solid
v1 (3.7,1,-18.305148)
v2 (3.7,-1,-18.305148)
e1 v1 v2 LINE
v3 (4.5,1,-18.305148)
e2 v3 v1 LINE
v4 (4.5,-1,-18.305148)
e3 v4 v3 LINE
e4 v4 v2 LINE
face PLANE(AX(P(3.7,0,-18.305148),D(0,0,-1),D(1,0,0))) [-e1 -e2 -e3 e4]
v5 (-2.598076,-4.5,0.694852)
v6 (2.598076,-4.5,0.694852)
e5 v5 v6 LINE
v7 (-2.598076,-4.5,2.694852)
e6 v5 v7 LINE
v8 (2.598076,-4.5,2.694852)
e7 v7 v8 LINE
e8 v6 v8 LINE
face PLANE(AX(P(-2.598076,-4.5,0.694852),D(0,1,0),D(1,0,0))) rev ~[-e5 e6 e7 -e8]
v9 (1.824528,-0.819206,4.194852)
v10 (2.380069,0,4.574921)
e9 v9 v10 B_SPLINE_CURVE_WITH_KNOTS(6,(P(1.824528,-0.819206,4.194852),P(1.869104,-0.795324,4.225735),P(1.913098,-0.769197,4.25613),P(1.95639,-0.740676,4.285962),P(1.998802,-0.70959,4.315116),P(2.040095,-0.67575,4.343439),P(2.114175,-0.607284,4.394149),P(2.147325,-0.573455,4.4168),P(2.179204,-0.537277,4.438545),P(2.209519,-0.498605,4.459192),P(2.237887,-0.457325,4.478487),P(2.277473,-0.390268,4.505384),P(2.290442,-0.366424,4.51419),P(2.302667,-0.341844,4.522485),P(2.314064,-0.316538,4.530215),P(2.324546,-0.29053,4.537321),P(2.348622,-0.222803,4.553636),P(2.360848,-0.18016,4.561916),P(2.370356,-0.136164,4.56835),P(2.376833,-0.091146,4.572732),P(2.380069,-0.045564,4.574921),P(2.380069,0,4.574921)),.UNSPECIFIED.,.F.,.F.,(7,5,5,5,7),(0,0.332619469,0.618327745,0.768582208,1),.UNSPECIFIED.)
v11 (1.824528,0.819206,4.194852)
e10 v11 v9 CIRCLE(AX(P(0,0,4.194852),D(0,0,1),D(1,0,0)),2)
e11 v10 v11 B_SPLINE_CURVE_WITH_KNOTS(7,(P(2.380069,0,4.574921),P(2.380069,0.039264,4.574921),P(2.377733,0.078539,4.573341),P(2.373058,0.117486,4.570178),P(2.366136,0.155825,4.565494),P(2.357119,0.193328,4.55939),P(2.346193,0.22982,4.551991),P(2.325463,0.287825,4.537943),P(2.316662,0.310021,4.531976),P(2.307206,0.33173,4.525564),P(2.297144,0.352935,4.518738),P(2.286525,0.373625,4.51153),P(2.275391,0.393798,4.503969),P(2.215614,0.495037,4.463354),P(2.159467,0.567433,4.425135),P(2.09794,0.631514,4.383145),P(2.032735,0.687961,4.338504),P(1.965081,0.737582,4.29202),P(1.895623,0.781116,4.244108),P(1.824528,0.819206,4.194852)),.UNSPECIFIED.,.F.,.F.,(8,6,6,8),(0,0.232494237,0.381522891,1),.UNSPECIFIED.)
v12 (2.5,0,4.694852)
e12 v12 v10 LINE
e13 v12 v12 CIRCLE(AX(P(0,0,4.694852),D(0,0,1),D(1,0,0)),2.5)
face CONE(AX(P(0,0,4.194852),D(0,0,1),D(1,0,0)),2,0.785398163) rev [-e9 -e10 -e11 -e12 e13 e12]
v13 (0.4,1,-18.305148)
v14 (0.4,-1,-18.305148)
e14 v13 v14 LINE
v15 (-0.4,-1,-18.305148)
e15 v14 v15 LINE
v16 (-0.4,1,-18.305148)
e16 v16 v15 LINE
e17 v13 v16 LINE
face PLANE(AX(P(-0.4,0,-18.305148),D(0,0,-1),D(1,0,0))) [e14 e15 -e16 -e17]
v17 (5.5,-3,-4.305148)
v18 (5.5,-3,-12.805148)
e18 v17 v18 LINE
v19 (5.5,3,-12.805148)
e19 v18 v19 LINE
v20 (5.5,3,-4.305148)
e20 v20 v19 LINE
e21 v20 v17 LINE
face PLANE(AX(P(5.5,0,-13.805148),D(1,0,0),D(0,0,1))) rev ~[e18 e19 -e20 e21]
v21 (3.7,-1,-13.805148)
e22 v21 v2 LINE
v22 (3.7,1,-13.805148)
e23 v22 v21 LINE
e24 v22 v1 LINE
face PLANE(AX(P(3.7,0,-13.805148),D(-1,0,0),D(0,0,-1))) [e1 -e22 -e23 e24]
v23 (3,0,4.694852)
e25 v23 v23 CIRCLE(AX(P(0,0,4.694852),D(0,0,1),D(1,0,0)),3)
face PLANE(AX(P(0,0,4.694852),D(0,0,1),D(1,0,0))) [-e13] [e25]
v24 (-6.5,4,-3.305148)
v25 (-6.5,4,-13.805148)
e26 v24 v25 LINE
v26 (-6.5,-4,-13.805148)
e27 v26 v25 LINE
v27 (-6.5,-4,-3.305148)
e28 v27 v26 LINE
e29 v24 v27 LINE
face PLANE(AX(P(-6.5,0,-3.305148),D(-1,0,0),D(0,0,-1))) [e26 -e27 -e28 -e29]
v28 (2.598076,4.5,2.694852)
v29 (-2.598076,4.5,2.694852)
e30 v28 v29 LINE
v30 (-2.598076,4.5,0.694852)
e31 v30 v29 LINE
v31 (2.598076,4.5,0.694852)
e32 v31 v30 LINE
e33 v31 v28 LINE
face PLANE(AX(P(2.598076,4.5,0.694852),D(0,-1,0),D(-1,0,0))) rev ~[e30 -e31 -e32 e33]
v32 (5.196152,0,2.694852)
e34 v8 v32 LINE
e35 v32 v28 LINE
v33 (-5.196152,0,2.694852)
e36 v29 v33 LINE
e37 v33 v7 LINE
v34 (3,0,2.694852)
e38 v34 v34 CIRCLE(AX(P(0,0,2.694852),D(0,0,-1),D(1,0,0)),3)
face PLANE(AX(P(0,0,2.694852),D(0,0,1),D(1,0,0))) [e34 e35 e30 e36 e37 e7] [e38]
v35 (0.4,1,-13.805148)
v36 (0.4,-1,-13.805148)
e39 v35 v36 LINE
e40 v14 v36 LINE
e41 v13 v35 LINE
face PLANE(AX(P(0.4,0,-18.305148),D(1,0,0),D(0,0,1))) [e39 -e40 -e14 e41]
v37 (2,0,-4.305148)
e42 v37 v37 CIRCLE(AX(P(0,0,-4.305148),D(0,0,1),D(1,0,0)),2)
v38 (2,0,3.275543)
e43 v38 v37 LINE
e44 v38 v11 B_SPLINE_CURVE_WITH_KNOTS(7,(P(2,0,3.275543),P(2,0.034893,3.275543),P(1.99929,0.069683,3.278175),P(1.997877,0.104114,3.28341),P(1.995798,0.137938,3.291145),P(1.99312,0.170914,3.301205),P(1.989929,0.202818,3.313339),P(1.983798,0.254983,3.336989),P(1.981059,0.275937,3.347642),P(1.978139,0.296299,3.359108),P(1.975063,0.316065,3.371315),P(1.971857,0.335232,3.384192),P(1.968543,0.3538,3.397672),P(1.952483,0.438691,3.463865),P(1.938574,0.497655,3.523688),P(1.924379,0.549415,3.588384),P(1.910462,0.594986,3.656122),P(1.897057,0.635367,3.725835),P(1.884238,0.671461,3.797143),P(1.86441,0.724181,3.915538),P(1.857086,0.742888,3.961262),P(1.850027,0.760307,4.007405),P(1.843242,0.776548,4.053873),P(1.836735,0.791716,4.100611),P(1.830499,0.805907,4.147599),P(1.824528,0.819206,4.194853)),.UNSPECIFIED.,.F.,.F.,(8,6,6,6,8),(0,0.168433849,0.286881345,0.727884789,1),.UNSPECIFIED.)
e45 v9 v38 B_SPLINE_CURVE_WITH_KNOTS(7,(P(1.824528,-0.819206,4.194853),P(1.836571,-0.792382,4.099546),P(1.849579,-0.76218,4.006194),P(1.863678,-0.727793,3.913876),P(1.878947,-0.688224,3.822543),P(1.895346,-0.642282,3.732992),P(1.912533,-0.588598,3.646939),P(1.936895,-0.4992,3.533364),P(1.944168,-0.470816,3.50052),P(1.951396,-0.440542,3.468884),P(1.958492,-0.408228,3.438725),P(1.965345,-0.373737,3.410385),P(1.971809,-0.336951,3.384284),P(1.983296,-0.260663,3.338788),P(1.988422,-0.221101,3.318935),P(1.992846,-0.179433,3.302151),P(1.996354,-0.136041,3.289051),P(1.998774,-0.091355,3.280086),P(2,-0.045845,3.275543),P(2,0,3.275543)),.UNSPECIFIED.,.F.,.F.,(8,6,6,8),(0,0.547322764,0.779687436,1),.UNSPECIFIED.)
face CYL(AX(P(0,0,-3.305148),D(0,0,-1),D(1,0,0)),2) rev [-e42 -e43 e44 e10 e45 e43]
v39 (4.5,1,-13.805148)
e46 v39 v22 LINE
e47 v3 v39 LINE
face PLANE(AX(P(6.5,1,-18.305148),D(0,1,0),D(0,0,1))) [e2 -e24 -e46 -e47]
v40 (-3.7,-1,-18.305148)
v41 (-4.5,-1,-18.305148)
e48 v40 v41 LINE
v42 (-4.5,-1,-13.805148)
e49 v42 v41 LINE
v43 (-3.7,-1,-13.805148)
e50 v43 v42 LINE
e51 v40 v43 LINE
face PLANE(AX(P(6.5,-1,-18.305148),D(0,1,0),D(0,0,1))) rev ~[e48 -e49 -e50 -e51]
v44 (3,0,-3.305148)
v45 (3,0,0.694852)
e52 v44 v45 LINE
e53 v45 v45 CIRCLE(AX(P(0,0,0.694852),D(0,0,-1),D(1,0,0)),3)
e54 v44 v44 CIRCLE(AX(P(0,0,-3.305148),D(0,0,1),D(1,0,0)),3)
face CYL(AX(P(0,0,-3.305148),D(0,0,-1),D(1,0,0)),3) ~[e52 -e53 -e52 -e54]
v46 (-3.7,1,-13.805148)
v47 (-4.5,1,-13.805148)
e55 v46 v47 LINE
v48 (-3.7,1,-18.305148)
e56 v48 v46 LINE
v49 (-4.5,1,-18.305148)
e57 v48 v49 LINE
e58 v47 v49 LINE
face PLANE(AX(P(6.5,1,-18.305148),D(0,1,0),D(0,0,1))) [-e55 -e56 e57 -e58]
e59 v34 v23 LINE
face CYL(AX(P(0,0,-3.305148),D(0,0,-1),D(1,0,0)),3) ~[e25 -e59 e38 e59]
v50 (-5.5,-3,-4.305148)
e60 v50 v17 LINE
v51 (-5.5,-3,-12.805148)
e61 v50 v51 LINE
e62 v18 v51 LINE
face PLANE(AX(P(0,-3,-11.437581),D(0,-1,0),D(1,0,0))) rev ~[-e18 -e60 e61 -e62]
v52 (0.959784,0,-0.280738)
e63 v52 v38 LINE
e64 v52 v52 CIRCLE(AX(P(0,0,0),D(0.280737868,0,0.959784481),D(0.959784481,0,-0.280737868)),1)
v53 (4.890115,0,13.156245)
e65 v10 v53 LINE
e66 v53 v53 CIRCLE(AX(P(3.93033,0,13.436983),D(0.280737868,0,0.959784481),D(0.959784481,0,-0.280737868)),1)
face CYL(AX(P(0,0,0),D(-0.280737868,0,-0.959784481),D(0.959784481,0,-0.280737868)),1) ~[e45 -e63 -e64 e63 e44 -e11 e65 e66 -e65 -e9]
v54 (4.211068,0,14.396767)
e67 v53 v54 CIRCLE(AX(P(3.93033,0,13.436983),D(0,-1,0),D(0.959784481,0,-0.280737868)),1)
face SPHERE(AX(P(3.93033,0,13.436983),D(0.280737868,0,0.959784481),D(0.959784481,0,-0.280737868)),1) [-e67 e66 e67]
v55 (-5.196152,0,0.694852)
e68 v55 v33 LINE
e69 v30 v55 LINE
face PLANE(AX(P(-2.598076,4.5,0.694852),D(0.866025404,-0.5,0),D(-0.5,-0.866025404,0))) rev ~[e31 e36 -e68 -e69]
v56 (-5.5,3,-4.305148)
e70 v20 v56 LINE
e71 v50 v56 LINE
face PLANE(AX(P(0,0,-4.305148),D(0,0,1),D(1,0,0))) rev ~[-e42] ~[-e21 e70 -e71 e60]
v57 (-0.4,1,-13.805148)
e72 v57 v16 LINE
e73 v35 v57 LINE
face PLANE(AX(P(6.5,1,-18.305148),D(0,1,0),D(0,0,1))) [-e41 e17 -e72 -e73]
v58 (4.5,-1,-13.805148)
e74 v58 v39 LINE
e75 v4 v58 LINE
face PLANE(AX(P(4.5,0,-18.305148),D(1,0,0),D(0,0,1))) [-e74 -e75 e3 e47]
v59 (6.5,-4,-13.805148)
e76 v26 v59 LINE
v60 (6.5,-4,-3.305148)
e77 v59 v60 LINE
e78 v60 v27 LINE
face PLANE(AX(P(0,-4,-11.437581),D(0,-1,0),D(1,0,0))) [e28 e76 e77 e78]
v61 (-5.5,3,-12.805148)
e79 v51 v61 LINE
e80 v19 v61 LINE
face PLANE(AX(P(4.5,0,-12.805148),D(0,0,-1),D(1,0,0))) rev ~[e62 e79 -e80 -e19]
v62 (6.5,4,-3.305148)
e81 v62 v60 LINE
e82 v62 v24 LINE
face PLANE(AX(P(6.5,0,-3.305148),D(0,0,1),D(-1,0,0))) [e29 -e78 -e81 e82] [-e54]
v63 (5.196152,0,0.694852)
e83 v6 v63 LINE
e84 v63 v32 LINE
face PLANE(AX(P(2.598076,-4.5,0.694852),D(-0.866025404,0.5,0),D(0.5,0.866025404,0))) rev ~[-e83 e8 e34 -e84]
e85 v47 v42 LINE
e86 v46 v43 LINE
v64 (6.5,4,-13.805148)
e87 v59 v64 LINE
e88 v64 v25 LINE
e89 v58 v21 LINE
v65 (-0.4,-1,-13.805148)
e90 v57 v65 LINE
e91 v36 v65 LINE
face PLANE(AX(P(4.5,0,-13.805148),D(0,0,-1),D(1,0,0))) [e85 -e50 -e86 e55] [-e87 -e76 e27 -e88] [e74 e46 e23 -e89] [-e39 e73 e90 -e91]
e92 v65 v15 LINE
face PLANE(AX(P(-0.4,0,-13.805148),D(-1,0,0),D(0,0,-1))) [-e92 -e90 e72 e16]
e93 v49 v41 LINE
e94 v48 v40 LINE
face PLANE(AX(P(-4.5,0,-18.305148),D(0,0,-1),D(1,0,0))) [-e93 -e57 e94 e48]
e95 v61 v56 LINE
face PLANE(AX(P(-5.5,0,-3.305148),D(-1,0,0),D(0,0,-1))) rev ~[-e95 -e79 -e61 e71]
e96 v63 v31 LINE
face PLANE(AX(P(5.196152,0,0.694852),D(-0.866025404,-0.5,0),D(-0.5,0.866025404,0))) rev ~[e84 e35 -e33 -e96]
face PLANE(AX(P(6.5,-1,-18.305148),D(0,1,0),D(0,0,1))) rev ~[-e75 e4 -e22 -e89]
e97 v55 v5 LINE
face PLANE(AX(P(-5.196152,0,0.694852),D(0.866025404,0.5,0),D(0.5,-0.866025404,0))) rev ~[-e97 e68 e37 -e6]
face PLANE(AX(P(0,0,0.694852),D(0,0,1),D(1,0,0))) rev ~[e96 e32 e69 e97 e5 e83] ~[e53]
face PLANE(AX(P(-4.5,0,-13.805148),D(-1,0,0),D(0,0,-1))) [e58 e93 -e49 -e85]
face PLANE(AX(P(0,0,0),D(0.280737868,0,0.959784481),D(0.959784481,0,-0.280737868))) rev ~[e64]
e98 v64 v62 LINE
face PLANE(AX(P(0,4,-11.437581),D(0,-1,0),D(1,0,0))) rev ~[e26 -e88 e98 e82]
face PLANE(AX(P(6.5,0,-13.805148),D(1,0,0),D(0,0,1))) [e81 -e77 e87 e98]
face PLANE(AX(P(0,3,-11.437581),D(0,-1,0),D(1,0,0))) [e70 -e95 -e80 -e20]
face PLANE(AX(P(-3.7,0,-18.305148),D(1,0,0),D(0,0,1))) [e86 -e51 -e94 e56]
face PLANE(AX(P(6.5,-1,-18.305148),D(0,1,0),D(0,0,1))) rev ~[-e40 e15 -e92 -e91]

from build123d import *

# Parameters (mm, degrees)
F1_DEPTH    = 4
F2_W        = 3
F2_H        = 4.5
F3_DEPTH    = 13.001
F4_R        = 3
F5_DEPTH    = 8
F8_DEPTH    = 2
F9_T        = 1
F9_T3_DEPTH = 2.8
F9_T5_DEPTH = 4
F9_T7_DEPTH = 2.8
F9_T9_DEPTH = 2.8
F11_SIZE    = 0.5
F13_R       = 1
F14_DEPTH   = 15
F15_R       = 1


# Not quite as in the source:
# - a shell that OpenCascade refuses in one call is made with other operations: the cavity is built on its own and cut out


with BuildPart() as f1:
    # F0 (on Front) → F1 (new body, symmetric)
    with BuildSketch(Plane.XZ):
        Polygon((6.5, -13.8051480774), (6.5, -3.3051480774), (-6.5, -3.3051480774), (-6.5, -13.8051480774), (-4.5, -13.8051480774), (-4.5, -18.3051480774), (-3.7, -18.3051480774), (-3.7, -13.8051480774), (-0.4, -13.8051480774), (-0.4, -18.3051480774), (0.4, -18.3051480774), (0.4, -13.8051480774), (3.7, -13.8051480774), (3.7, -18.3051480774), (4.5, -18.3051480774), (4.5, -13.8051480774), align=None)
    extrude(amount=F1_DEPTH, both=True)

    # F2 (on face) → F3 (cut, through all)
    with BuildSketch(Plane.YZ.offset(6.5)):
        with Locations((-2.5, -16.0551480774)):
            Rectangle(F2_W, F2_H)
        with Locations((2.5, -16.0551480774)):
            Rectangle(F2_W, F2_H)
    extrude(amount=-F3_DEPTH, mode=Mode.SUBTRACT)

    # F4 (on face) → F5 (join)
    with BuildSketch(Plane.XY.offset(-3.3051480774)):
        Circle(F4_R)
    extrude(amount=F5_DEPTH)

    # F7 (on offset) → F8 (join)
    with BuildSketch(Plane.XY.offset(0.6948519226)):
        Polygon((2.5980762114, -4.5), (5.1961524227, 0), (2.5980762114, 4.5), (-2.5980762114, 4.5), (-5.1961524227, 0), (-2.5980762114, -4.5), align=None)
    extrude(amount=F8_DEPTH)

    # F9: shell of thickness 1, made by hand


with BuildPart() as f9_core1:
    # F9_t2: copy of F1
    add(f1.part)

    # the walls: a layer under each face that stays
    f9_faces = [f9_core1.faces().sort_by_distance(p)[0] for p in [
        (-4.3333333333, 2.6666666667, -13.8051480774),
        (6.5, 0, -8.5551480774),
        (0, -4, -8.5551480774),
        (-6.5, 0, -8.5551480774),
        (0, 4, -8.5551480774),
        (0, 1, -16.0551480774),
        (-0.4, 0, -16.0551480774),
        (0, -1, -16.0551480774),
        (0.4, 0, -16.0551480774),
        (3.7, 0, -16.0551480774),
        (4.1, -1, -16.0551480774),
        (4.5, 0, -16.0551480774),
        (4.1, 1, -16.0551480774),
        (-4.1, 1, -16.0551480774),
        (-4.5, 0, -16.0551480774),
        (-4.1, -1, -16.0551480774),
        (-3.7, 0, -16.0551480774),
        (4.3333333333, 2.6666666667, -3.3051480774),
        (0, 0, -18.3051480774),
        (4.1, 0, -18.3051480774),
        (-4.1, 0, -18.3051480774),
        (-3, 0, -1.3051480774),
        (-3.4641016151, 0, 0.6948519226),
        (-3.897114317, -2.25, 1.6948519226),
        (-3.897114317, 2.25, 1.6948519226),
        (0, -4.5, 1.6948519226),
        (0, 4.5, 1.6948519226),
        (3.897114317, -2.25, 1.6948519226),
        (3.897114317, 2.25, 1.6948519226),
        (-3.4641016151, 0, 2.6948519226),
        (-3, 0, 3.6948519226),
    ]]
    thicken(f9_faces, amount=-F9_T, mode=Mode.SUBTRACT)

    # F9_s4 → F9_t3 (cut)
    with BuildSketch(Plane.YZ.offset(-1.4)):
        Polygon((1.01, -13.8151480774), (1, -12.8051480774), (0, -12.8051480774), (0, -13.8051480774), align=None)
        Polygon((-1.01, -13.8151480774), (-1, -12.8051480774), (0, -12.8051480774), (0, -13.8051480774), align=None)
    extrude(amount=F9_T3_DEPTH, mode=Mode.SUBTRACT)

    # F9_s6 → F9_t5 (cut)
    with BuildSketch(Plane.XZ.offset(-2)):
        Polygon((-0.41, -13.8151480774), (-0.4, -12.8051480774), (0.6, -12.8051480774), (0.6, -13.8051480774), align=None)
        Polygon((0.41, -13.8151480774), (0.4, -12.8051480774), (-0.6, -12.8051480774), (-0.6, -13.8051480774), align=None)
        Polygon((3.69, -13.8151480774), (3.7, -12.8051480774), (4.7, -12.8051480774), (4.7, -13.8051480774), align=None)
        Polygon((4.51, -13.8151480774), (4.5, -12.8051480774), (3.5, -12.8051480774), (3.5, -13.8051480774), align=None)
        Polygon((-4.51, -13.8151480774), (-4.5, -12.8051480774), (-3.5, -12.8051480774), (-3.5, -13.8051480774), align=None)
        Polygon((-3.69, -13.8151480774), (-3.7, -12.8051480774), (-4.7, -12.8051480774), (-4.7, -13.8051480774), align=None)
    extrude(amount=F9_T5_DEPTH, mode=Mode.SUBTRACT)

    # F9_s8 → F9_t7 (cut)
    with BuildSketch(Plane.YZ.offset(2.7)):
        Polygon((-1.01, -13.8151480774), (-1, -12.8051480774), (0, -12.8051480774), (0, -13.8051480774), align=None)
        Polygon((1.01, -13.8151480774), (1, -12.8051480774), (0, -12.8051480774), (0, -13.8051480774), align=None)
    extrude(amount=F9_T7_DEPTH, mode=Mode.SUBTRACT)

    # F9_s10 → F9_t9 (cut)
    with BuildSketch(Plane.YZ.offset(-5.5)):
        Polygon((1.01, -13.8151480774), (1, -12.8051480774), (0, -12.8051480774), (0, -13.8051480774), align=None)
        Polygon((-1.01, -13.8151480774), (-1, -12.8051480774), (0, -12.8051480774), (0, -13.8051480774), align=None)
    extrude(amount=F9_T9_DEPTH, mode=Mode.SUBTRACT)

    # F9_s11 → F9_t12 (revolve, cut)
    with BuildSketch(Plane.XZ):
        Polygon((3.01, -3.2951480774), (3, -4.3051480774), (2, -4.3051480774), (2, -3.3051480774), align=None)
    revolve(axis=Axis((0, 0, -3.3051480774), (0, 0, 1)), mode=Mode.SUBTRACT)

    # F9_s13 → F9_t14 (revolve, cut)
    with BuildSketch(Plane.XZ):
        Polygon((3.01, 0.6848519226), (2, 0.6948519226), (2, 1.6948519226), (3, 1.6948519226), align=None)
    revolve(axis=Axis((0, 0, 0.6948519226), (0, 0, -1)), mode=Mode.SUBTRACT)

    # F9_s15 → F9_t16 (revolve, cut)
    with BuildSketch(Plane.XZ):
        Polygon((3.01, 2.7048519226), (3, 1.6948519226), (2, 1.6948519226), (2, 2.6948519226), align=None)
    revolve(axis=Axis((0, 0, 2.6948519226), (0, 0, -1)), mode=Mode.SUBTRACT)


with BuildPart() as f1_1:
    add(f1.part)

    # what is left inside the walls is the cavity
    f9_cavity = [f9_core1.part.solids().sort_by_distance(p)[0] for p in [
        (0, 2.99, -9.971815),
    ]]
    add(f9_cavity, mode=Mode.SUBTRACT)

    # F11
    f11_edges = [f1_1.edges().sort_by_distance(p)[0] for p in [
        (-2, 0, 4.694852),
    ]]
    chamfer(f11_edges, length=F11_SIZE)

    # F13 (on line) → F14 (join)
    with BuildSketch(Plane(origin=(0, 0, 0), x_dir=(0.9597844806, 0, -0.2807378684), z_dir=(0.2807378684, 0, 0.9597844806))):
        Circle(F13_R)
    extrude(amount=F14_DEPTH)

    # F15
    f15_edges = [f1_1.edges().sort_by_distance(p)[0] for p in [
        (3.251284, 0, 14.677505),
    ]]
    fillet(f15_edges, radius=F15_R)


solid = f1_1.part
